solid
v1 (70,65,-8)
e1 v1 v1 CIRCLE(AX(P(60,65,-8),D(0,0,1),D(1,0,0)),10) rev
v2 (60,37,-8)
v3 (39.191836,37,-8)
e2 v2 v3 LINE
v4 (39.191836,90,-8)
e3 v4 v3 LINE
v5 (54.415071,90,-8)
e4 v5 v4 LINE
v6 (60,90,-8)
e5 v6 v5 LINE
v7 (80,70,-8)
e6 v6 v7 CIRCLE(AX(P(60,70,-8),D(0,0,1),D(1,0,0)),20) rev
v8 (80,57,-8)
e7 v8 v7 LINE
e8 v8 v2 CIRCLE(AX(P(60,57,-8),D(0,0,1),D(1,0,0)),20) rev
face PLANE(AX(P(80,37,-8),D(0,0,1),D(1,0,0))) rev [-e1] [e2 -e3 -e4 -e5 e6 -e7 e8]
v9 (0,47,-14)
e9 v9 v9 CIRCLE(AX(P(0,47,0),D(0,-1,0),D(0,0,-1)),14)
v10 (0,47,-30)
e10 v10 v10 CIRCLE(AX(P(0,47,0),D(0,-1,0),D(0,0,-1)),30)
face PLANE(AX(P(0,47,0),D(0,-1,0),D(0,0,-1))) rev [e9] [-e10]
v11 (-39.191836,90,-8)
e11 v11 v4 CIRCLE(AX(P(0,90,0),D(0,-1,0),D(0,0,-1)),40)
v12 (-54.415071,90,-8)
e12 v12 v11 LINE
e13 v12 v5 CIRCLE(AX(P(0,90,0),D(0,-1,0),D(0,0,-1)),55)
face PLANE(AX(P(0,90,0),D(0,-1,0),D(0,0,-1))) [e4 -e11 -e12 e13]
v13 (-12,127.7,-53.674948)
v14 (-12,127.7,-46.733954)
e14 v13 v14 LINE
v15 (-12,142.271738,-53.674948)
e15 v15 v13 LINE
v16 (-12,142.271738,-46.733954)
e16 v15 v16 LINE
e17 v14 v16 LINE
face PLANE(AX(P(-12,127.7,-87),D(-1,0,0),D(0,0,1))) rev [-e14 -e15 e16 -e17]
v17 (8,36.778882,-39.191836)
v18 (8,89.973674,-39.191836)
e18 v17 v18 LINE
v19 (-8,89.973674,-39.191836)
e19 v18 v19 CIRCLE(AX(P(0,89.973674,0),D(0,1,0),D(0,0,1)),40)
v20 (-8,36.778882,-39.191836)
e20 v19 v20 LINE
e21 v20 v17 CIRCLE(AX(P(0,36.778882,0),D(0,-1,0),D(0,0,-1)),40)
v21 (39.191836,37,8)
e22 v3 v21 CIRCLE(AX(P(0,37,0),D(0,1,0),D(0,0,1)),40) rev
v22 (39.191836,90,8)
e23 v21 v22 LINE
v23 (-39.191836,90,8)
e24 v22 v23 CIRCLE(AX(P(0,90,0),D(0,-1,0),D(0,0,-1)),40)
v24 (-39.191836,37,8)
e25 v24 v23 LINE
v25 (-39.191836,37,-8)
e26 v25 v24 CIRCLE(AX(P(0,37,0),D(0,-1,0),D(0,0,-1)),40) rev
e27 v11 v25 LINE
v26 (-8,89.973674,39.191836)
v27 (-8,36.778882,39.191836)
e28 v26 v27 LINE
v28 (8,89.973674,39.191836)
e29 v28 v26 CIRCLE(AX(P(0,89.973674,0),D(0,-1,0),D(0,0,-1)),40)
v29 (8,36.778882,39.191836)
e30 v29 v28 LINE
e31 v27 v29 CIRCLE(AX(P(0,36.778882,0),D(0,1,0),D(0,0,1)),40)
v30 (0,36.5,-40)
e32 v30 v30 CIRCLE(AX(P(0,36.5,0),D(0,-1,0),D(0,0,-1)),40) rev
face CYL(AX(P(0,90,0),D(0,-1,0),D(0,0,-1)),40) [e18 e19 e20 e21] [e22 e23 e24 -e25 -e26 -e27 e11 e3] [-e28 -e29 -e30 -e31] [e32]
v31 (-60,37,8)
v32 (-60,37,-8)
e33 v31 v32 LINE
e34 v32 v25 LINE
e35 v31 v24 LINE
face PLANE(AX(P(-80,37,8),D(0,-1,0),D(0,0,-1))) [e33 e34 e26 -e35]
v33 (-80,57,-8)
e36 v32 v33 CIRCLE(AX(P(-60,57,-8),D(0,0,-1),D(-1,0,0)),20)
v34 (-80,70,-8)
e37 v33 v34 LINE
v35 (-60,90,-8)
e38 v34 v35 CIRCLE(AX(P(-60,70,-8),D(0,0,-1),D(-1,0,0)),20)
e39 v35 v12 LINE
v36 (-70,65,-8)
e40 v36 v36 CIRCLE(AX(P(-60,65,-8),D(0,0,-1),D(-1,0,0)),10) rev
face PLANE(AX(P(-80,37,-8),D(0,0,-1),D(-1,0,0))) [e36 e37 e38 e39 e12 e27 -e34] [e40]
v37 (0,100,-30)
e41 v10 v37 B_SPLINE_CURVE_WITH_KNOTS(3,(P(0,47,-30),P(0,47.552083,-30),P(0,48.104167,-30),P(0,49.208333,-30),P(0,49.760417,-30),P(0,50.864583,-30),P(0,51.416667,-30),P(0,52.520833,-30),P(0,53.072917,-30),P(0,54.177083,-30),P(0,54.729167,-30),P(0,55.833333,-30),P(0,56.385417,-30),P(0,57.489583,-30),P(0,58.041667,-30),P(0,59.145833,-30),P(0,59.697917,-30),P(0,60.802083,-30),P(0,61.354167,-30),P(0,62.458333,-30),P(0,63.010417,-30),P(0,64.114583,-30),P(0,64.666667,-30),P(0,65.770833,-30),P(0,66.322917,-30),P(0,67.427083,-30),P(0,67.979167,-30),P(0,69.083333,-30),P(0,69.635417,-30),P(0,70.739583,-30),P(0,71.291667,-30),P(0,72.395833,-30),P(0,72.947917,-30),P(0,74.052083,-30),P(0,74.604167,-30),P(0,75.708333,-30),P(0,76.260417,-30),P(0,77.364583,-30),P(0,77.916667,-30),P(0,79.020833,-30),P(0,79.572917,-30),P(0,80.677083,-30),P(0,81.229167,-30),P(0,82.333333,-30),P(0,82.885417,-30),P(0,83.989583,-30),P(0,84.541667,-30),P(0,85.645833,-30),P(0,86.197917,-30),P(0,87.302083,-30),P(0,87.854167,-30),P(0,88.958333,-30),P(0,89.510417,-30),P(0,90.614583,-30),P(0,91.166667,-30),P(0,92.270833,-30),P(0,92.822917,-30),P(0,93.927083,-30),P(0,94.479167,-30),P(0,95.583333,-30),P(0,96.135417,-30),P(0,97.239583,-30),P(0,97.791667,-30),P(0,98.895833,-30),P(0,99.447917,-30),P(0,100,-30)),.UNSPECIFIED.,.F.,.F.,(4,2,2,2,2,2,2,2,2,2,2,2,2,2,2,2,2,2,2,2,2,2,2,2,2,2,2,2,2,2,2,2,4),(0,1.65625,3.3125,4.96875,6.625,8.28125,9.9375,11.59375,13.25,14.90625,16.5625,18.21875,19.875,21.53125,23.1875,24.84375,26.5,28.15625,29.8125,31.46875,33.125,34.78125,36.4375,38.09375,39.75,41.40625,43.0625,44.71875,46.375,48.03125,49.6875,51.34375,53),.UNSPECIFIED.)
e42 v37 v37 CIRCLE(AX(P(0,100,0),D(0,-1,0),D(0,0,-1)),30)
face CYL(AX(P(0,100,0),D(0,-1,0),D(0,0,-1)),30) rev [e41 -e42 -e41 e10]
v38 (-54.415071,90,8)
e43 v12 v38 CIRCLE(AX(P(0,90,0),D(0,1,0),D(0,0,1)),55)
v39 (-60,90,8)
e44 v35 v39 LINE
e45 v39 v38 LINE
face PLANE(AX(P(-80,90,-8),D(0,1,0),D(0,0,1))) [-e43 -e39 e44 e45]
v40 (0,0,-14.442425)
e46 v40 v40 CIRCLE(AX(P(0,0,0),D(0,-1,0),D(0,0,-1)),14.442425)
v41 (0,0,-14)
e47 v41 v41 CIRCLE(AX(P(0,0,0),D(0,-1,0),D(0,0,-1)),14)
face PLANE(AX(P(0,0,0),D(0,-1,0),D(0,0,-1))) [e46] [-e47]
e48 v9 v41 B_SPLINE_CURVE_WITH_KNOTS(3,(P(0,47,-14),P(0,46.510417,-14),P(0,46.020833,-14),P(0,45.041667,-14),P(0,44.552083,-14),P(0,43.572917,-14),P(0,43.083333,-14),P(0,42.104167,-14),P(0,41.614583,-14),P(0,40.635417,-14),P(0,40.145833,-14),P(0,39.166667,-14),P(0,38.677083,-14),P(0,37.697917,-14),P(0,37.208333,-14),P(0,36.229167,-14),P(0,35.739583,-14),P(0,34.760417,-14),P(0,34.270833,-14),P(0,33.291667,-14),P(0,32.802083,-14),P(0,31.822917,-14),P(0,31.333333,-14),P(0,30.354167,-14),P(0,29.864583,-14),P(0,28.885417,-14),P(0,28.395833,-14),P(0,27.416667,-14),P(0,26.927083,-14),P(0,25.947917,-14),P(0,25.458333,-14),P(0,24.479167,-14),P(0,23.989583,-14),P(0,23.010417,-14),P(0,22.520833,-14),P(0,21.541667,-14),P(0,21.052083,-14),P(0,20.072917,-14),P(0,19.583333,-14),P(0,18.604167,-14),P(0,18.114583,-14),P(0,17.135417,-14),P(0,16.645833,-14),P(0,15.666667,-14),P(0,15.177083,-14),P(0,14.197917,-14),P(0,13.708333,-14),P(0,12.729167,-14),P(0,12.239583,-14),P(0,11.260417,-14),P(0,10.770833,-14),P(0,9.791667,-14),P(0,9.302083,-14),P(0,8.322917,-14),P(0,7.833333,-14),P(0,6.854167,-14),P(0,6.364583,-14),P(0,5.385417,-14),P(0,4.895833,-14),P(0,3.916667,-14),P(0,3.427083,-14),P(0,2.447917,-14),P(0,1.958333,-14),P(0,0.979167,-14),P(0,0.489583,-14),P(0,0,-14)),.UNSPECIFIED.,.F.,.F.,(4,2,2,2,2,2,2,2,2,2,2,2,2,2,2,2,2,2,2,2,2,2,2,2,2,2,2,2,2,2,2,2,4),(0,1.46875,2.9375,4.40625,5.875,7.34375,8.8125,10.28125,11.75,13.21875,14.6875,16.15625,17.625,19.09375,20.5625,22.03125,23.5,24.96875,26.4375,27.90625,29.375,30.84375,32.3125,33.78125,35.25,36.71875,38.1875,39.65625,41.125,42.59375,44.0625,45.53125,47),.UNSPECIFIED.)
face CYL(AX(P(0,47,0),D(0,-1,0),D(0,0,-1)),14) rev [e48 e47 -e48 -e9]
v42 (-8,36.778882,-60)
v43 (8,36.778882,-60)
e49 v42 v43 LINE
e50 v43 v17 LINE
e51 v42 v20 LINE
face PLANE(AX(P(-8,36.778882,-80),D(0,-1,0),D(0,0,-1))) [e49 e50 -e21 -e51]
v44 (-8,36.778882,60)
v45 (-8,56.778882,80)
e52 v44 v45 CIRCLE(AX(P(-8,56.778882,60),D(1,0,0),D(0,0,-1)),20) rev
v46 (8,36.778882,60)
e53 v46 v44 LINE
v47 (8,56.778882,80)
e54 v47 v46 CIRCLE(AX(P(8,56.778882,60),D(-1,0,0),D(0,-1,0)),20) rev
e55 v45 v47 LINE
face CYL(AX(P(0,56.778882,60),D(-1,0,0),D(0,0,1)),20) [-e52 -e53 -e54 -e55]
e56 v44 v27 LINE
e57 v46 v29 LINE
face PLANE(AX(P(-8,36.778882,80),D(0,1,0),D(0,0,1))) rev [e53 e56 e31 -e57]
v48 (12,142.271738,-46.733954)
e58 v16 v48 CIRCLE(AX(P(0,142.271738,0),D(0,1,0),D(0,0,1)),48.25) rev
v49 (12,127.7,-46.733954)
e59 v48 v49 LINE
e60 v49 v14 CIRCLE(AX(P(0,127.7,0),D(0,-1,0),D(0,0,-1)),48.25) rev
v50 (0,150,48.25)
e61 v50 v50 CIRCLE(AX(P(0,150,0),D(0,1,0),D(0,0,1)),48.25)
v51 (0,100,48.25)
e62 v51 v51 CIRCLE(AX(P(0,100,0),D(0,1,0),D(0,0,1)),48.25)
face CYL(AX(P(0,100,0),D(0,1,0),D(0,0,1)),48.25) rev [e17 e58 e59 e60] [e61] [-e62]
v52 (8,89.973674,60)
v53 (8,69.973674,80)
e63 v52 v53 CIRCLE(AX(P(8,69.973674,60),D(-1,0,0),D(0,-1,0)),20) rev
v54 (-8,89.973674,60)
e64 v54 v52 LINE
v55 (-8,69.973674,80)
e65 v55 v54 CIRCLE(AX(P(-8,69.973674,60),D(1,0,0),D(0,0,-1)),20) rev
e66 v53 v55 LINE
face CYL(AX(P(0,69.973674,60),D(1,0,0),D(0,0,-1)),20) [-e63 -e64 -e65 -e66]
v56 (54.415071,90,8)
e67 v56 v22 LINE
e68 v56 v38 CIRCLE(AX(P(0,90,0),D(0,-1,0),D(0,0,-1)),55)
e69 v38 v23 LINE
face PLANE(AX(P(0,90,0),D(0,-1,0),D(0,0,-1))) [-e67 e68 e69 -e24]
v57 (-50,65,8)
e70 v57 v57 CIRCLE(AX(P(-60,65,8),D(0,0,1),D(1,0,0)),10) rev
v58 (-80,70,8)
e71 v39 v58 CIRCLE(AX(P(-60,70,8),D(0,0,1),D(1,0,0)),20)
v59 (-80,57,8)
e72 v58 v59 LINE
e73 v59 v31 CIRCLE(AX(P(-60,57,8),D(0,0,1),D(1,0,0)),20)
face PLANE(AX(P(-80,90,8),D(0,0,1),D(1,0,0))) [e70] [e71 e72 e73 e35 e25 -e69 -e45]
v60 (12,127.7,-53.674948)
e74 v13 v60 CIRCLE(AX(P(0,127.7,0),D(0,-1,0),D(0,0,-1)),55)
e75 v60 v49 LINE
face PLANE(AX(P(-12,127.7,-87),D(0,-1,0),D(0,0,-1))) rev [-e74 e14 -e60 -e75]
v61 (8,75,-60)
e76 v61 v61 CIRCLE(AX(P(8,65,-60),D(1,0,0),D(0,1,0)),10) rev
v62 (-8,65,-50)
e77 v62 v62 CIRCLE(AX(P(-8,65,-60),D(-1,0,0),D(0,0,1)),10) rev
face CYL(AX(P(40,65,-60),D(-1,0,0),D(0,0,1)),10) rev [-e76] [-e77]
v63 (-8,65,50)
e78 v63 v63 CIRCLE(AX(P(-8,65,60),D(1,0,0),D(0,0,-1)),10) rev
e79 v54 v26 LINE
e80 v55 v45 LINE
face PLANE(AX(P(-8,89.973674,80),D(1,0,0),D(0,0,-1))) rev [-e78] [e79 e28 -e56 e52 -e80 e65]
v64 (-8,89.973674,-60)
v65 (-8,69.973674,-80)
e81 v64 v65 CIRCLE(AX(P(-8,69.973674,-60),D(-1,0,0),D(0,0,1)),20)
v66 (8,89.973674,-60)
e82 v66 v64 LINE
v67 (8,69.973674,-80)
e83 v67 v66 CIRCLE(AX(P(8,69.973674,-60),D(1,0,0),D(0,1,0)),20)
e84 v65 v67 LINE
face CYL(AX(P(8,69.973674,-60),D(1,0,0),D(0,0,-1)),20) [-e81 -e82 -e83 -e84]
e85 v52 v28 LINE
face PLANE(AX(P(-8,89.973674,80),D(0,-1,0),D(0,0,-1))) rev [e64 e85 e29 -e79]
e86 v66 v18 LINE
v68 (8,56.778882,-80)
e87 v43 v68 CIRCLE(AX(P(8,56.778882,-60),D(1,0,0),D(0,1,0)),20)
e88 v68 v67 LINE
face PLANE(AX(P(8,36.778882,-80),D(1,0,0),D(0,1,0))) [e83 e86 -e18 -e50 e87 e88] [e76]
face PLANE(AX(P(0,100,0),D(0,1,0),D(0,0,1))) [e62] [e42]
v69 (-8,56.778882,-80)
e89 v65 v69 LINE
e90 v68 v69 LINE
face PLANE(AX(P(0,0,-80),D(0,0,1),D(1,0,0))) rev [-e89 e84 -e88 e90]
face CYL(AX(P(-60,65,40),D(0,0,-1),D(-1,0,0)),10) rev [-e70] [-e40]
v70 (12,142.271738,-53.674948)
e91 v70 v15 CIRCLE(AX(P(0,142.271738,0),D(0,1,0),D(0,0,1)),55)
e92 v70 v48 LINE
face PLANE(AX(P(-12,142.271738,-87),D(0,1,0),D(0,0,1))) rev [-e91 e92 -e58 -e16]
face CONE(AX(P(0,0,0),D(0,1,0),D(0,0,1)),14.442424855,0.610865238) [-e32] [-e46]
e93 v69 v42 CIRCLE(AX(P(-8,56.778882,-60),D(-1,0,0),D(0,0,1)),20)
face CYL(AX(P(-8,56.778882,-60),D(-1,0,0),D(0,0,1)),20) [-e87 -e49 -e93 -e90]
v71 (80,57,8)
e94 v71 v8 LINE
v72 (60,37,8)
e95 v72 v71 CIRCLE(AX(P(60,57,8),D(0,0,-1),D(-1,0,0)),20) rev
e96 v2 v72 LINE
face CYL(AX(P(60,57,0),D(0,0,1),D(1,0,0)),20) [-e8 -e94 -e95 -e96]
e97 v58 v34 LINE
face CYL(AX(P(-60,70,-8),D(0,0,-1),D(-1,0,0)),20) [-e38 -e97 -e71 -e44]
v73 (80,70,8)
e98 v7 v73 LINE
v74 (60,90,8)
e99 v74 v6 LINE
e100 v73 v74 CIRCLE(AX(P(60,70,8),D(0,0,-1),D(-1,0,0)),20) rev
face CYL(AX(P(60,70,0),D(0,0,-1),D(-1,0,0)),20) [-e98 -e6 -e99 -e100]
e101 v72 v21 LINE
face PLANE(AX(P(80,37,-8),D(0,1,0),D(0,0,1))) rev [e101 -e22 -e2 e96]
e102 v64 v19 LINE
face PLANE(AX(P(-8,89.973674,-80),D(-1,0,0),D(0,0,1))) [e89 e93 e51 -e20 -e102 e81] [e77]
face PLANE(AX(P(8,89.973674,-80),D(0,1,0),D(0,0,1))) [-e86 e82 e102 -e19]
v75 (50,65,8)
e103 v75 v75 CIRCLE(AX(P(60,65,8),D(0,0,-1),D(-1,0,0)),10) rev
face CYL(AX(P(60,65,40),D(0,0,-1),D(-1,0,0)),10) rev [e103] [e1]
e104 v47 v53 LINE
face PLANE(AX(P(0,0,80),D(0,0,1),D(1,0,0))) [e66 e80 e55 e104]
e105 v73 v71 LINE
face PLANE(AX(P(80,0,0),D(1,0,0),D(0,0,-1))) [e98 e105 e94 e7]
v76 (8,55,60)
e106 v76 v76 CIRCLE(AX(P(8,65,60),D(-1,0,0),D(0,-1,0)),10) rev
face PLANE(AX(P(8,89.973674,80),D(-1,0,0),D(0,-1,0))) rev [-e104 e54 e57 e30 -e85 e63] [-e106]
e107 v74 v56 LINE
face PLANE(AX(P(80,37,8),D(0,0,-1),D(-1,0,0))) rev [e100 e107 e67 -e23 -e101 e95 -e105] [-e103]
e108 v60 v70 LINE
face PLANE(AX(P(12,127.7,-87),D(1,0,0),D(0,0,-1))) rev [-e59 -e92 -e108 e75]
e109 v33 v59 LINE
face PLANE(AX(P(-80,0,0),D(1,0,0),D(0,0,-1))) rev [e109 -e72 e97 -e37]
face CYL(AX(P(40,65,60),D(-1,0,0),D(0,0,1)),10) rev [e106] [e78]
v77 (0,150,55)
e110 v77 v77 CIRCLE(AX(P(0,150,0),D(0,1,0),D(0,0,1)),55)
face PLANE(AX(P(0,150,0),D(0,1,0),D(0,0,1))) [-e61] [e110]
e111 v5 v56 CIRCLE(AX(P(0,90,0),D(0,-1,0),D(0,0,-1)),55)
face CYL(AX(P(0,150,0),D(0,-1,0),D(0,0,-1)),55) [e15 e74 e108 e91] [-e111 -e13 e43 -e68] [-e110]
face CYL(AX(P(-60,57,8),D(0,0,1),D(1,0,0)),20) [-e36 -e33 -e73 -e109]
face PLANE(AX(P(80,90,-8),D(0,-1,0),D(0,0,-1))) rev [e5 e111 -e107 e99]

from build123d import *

# Parameters (mm, degrees)
SKETCH_1_R               = 55
EXTRUDE_1_DEPTH          = 150
SKETCH_2_R               = 30
CUT_EXTRUDE_1_DEPTH      = 100
SKETCH_3_R               = 48.25
CUT_EXTRUDE_2_DEPTH      = 50
SKETCH_4_R               = 60
SKETCH_4_R_2             = 40
CUT_EXTRUDE_1_2_DEPTH    = 90
EXTRUDE_START            = 30
SKETCH_6_W               = 16
SKETCH_6_H               = 53.194792051
EXTRUDE_3_DEPTH          = 50
EXTRUDE_START_2          = -30
SKETCH_10_W              = 16
SKETCH_10_H              = 53.194792051
EXTRUDE_4_DEPTH          = 50
SKETCH_11_W              = 16
SKETCH_11_H              = 53
EXTRUDE_6_DEPTH          = 50
SKETCH_12_W              = 16
SKETCH_12_H              = 53
EXTRUDE_7_DEPTH          = 50
FILLET_1_R               = 20
FILLET_2_R               = 20
FILLET_3_R               = 20
FILLET_4_R               = 20
CUT_EXTRUDE_4_DEPTH      = 40
CUT_EXTRUDE_4_DEPTH_BACK = 40
SKETCH_15_R              = 10
CUT_EXTRUDE_5_DEPTH      = 40
CUT_EXTRUDE_5_DEPTH_BACK = 40
SKETCH_16_R              = 10
SKETCH_17_W              = 24
SKETCH_17_H              = 14.571737585
CUT_EXTRUDE_6_DEPTH      = 87
SKETCH_18_R              = 34
SKETCH_18_R_2            = 14
EXTRUDE_1_2_DEPTH        = 47


with BuildPart() as part:
    # 草图1 → Extrude 1 (new body)
    with BuildSketch(Plane(origin=(0, 0, 0), x_dir=(1, 0, 0), z_dir=(0, 1, 0))):
        with Locations(Location((0, 0, 0), (0, 0, 270))):
            Circle(SKETCH_1_R)
    extrude(amount=EXTRUDE_1_DEPTH)

    # 草图2 → Cut-Extrude 1 (cut)
    with BuildSketch(Plane.XZ):
        with Locations(Location((0, 0, 0), (0, 0, 270))):
            Circle(SKETCH_2_R)
    extrude(amount=-CUT_EXTRUDE_1_DEPTH, mode=Mode.SUBTRACT)

    # 草图3 → 切除-拉伸2 (cut)
    with BuildSketch(Plane(origin=(0, 150, 0), x_dir=(1, 0, 0), z_dir=(0, 1, 0))):
        with Locations(Location((0, 0, 0), (0, 0, 270))):
            Circle(SKETCH_3_R)
    extrude(amount=-CUT_EXTRUDE_2_DEPTH, mode=Mode.SUBTRACT)

    # 草图4 → Cut-Extrude 1 2 (cut)
    with BuildSketch(Plane.XZ):
        Circle(SKETCH_4_R)
        Circle(SKETCH_4_R_2, mode=Mode.SUBTRACT)
    extrude(amount=-CUT_EXTRUDE_1_2_DEPTH, mode=Mode.SUBTRACT)

    # 草图11 → 凸台-拉伸6 (add)
    with BuildSketch(Plane(origin=(0, 0, 0), x_dir=(0, 0, -1), z_dir=(1, 0, 0)).offset(EXTRUDE_START)):
        with Locations((0, 63.5)):
            Rectangle(SKETCH_11_W, SKETCH_11_H)
    extrude(amount=EXTRUDE_6_DEPTH)

    # 草图12 → 凸台-拉伸7 (add)
    with BuildSketch(Plane(origin=(0, 0, 0), x_dir=(0, 0, -1), z_dir=(1, 0, 0)).offset(EXTRUDE_START_2)):
        with Locations((0, 63.5)):
            Rectangle(SKETCH_12_W, SKETCH_12_H)
    extrude(amount=-EXTRUDE_7_DEPTH)

    # 圆角1
    fillet_1_edges = [part.edges().sort_by_distance(p)[0] for p in [
        (-80, 90, 0),
        (-80, 37, 0),
    ]]
    fillet(fillet_1_edges, radius=FILLET_1_R)

    # 圆角3
    fillet_3_edges = [part.edges().sort_by_distance(p)[0] for p in [
        (80, 37, 0),
        (80, 90, 0),
    ]]
    fillet(fillet_3_edges, radius=FILLET_3_R)

    # 草图15 → 切除-拉伸4 (cut, two sides: drawn at the far end of the back side and taken through both)
    with BuildSketch(Plane.XY.offset(-CUT_EXTRUDE_4_DEPTH_BACK)):
        with Locations(Location((60, 65, 0), (0, 0, 180))):
            Circle(SKETCH_15_R)
        with Locations(Location((-60, 65, 0), (0, 0, 180))):
            Circle(SKETCH_15_R)
    extrude(amount=CUT_EXTRUDE_4_DEPTH + CUT_EXTRUDE_4_DEPTH_BACK, mode=Mode.SUBTRACT)

    # 草图17 → 切除-拉伸6 (cut)
    with BuildSketch(Plane.XY):
        with Locations((0, 134.985868793)):
            Rectangle(SKETCH_17_W, SKETCH_17_H)
    extrude(amount=-CUT_EXTRUDE_6_DEPTH, mode=Mode.SUBTRACT)



with BuildPart() as body_2:
    # 草图6 → 凸台-拉伸3 (new body)
    with BuildSketch(Plane.XY.offset(EXTRUDE_START)):
        with Locations((0, 63.37627806)):
            Rectangle(SKETCH_6_W, SKETCH_6_H)
    extrude(amount=EXTRUDE_3_DEPTH)

    # 圆角4
    fillet_4_edges = [body_2.edges().sort_by_distance(p)[0] for p in [
        (0, 36.778882035, 80),
        (0, 89.973674086, 80),
    ]]
    fillet(fillet_4_edges, radius=FILLET_4_R)


with BuildPart() as body_3:
    # 草图10 → 凸台-拉伸4 (new body)
    with BuildSketch(Plane.XY.offset(EXTRUDE_START_2)):
        with Locations((0, 63.37627806)):
            Rectangle(SKETCH_10_W, SKETCH_10_H)
    extrude(amount=-EXTRUDE_4_DEPTH)

    # 圆角2
    fillet_2_edges = [body_3.edges().sort_by_distance(p)[0] for p in [
        (0, 89.973674086, -80),
        (0, 36.778882035, -80),
    ]]
    fillet(fillet_2_edges, radius=FILLET_2_R)


with BuildPart() as cut_extrude_5_tool:
    # 草图16 → 切除-拉伸5 (new, two sides: drawn at the far end of the back side and taken through both)
    with BuildSketch(Plane(origin=(0, 0, 0), x_dir=(0, 0, -1), z_dir=(1, 0, 0)).offset(-CUT_EXTRUDE_5_DEPTH_BACK)):
        with Locations(Location((60, 65, 0), (0, 0, 180))):
            Circle(SKETCH_16_R)
        with Locations(Location((-60, 65, 0), (0, 0, 270))):
            Circle(SKETCH_16_R)
    extrude(amount=CUT_EXTRUDE_5_DEPTH + CUT_EXTRUDE_5_DEPTH_BACK)


with BuildPart() as body_2_1:
    add(body_2.part)

    # 切除-拉伸5: cut by cut_extrude_5_tool
    add(cut_extrude_5_tool.part, mode=Mode.SUBTRACT)


with BuildPart() as body_3_1:
    add(body_3.part)

    # 切除-拉伸5: cut by cut_extrude_5_tool
    add(cut_extrude_5_tool.part, mode=Mode.SUBTRACT)


with BuildPart() as part_1:
    add(part.part)

    add(body_2_1.part)  # Extrude 1 2 merges body 2

    add(body_3_1.part)  # Extrude 1 2 merges body 3
    # 草图18 → Extrude 1 2 (add)
    with BuildSketch(Plane.XZ):
        Circle(SKETCH_18_R)
        Circle(SKETCH_18_R_2, mode=Mode.SUBTRACT)
    extrude(amount=-EXTRUDE_1_2_DEPTH)

    # 倒角1: read off the stored shape, not the designer's step
    # 倒角1 outline → 倒角1 (revolve, cut)
    with BuildSketch(Plane.XY):
        Polygon((40, 36.5), (14.442424855, 0), (40, 0), align=None)
    revolve(axis=Axis((0, 0, 0), (0, 1, 0)), mode=Mode.SUBTRACT)


solid = part_1.part
